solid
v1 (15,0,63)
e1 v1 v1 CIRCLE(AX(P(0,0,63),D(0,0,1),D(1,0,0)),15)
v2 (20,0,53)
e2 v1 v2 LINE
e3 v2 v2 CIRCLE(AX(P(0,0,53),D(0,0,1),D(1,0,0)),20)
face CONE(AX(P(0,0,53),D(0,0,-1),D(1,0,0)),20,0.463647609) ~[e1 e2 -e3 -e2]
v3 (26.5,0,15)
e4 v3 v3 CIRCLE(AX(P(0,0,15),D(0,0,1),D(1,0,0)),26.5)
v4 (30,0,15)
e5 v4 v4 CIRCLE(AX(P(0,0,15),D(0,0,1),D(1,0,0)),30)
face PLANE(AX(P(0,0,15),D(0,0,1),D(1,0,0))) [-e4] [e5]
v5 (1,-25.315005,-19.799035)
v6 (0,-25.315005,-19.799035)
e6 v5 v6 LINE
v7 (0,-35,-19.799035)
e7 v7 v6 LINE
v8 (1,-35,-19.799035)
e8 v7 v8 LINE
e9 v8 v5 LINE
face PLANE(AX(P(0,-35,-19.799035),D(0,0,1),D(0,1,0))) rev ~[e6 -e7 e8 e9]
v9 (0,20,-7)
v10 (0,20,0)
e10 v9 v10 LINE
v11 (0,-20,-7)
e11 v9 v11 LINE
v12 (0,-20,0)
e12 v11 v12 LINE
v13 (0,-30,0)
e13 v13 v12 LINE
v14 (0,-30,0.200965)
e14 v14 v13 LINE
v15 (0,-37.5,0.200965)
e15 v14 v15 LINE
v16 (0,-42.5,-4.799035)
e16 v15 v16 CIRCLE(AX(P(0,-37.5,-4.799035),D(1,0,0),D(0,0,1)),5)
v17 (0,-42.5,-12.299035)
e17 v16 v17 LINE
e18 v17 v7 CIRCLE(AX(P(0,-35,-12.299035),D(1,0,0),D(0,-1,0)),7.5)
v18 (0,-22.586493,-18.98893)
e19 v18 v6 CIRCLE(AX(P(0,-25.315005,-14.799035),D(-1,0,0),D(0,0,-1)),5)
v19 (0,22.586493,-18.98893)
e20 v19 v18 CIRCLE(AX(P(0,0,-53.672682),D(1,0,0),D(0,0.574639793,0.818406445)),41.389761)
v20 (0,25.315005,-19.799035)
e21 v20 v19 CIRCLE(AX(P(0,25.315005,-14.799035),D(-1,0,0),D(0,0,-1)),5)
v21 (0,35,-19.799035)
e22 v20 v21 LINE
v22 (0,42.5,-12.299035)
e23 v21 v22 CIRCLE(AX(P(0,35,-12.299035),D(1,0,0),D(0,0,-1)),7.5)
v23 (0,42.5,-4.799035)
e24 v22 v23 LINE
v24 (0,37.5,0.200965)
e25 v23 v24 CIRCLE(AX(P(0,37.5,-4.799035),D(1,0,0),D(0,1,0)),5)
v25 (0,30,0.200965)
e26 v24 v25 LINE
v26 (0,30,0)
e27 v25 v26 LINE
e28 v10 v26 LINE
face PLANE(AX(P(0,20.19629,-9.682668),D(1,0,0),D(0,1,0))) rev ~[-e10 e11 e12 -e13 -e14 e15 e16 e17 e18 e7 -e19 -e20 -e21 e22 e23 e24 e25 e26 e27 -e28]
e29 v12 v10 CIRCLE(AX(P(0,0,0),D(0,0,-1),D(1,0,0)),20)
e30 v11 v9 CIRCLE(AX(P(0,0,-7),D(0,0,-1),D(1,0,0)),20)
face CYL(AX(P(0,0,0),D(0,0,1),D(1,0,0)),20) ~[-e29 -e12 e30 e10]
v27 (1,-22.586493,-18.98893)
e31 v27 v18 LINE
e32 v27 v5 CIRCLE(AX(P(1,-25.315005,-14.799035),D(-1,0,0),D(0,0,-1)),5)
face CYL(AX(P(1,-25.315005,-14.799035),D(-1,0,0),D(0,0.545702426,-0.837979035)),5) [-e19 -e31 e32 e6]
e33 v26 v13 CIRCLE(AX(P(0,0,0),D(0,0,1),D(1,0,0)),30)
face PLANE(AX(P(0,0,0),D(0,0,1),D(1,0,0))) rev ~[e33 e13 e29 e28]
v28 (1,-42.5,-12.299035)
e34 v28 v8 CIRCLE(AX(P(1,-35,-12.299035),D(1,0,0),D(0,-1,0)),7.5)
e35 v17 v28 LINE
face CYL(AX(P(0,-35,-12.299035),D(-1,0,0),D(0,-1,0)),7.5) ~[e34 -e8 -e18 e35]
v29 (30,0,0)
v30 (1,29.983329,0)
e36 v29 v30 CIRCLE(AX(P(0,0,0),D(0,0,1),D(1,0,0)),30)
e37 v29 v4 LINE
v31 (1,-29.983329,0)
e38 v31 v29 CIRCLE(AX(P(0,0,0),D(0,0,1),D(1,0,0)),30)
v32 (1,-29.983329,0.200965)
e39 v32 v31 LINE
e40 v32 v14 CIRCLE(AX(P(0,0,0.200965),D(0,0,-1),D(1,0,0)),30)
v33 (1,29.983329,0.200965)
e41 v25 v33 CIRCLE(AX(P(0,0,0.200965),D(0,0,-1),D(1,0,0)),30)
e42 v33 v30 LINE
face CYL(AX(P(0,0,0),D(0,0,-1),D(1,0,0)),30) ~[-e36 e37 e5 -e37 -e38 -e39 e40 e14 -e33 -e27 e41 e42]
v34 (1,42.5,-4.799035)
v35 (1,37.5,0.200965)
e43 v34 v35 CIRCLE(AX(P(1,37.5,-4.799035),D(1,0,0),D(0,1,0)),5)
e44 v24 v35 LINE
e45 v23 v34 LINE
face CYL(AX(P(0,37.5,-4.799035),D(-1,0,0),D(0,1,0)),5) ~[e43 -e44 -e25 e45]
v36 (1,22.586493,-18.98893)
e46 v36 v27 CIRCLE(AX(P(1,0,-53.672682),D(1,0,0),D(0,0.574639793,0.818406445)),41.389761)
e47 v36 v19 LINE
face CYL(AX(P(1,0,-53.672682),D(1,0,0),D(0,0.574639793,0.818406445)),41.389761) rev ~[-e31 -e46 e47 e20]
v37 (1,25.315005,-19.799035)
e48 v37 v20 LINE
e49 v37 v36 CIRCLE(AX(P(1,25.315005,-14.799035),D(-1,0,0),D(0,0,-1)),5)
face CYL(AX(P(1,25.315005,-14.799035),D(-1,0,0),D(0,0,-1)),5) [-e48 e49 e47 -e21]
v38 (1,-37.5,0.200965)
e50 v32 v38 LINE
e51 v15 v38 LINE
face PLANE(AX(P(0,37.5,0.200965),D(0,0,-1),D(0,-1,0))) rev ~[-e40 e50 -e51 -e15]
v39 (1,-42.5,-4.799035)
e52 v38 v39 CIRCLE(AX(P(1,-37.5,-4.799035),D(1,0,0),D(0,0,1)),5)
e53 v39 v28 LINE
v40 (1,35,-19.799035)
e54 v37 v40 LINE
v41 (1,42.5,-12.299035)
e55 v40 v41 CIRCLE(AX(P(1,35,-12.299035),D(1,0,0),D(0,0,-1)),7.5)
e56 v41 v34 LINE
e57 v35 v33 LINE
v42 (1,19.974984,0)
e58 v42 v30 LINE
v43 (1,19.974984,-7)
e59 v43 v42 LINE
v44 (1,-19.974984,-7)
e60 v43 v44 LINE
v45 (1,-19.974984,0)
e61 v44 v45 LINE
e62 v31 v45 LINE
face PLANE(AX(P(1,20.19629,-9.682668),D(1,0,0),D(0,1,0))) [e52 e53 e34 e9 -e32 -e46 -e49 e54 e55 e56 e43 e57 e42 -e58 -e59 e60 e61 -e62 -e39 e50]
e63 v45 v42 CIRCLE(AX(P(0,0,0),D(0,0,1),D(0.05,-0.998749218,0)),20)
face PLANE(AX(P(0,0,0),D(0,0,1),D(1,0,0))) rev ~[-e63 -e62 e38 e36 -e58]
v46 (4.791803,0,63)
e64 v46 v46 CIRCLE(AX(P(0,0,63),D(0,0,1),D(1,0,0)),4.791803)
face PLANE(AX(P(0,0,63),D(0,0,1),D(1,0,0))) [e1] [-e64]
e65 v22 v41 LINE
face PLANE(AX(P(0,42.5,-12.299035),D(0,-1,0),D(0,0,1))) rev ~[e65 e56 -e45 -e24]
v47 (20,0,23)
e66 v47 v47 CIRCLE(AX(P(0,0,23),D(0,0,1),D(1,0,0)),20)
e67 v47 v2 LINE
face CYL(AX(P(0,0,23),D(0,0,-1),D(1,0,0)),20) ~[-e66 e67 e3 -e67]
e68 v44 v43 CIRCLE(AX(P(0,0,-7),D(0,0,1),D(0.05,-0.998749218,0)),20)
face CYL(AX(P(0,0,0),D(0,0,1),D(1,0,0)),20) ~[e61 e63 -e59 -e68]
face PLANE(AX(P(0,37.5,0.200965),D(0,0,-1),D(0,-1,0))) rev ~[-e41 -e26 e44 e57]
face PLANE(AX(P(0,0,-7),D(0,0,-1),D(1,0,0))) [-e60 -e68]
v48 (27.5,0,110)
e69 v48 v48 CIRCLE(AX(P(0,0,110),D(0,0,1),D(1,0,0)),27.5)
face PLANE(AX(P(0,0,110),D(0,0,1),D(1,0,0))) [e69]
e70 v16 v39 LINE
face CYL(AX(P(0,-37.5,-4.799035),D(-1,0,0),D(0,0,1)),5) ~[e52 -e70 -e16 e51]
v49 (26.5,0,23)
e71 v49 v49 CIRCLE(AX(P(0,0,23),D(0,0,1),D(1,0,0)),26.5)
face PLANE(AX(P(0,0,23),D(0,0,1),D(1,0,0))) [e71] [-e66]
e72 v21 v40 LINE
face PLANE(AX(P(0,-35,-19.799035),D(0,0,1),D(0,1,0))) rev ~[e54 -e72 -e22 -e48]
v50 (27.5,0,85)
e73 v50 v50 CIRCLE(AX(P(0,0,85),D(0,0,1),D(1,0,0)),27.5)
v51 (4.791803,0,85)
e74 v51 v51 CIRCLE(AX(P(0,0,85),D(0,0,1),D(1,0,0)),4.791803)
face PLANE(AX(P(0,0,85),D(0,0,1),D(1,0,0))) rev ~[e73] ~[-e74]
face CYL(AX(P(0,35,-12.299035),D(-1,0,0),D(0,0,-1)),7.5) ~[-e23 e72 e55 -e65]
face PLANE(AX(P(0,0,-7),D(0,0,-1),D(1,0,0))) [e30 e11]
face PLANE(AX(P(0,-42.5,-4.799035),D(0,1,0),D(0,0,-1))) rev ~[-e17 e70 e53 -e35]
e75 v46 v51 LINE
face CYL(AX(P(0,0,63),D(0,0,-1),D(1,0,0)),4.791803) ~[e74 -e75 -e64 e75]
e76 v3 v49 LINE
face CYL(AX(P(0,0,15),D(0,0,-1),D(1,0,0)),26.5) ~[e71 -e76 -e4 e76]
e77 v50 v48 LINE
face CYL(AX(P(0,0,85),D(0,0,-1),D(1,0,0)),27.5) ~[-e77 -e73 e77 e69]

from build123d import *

# Parameters (mm, degrees)
F0_R      = 30
F1_DEPTH  = 15
F2_R      = 26.5
F3_DEPTH  = 8
F4_R      = 20
F5_DEPTH  = 40
F6_R      = 20
F7_DEPTH  = 7
F9_DEPTH  = 1
F11_DEPTH = 25
F12_R     = 5
F13_SIZE2 = 10
F13_SIZE  = 5
F14_R     = 1
F15_DEPTH = 15
F16_R     = 4.7918026285
F16_R_2   = 1
F17_DEPTH = 22
F18_R     = 27.5
F18_R_2   = 4.7918026285
F19_DEPTH = 25


# Not quite as in the source:
# - a feature names something its author has since deleted; it is built from what else it names


with BuildPart() as f1:
    # F0 (on Top) → F1 (new body)
    with BuildSketch(Plane.XY):
        Circle(F0_R)
    extrude(amount=F1_DEPTH)

    # F2 (on face) → F3 (join)
    with BuildSketch(Plane.XY.offset(15)):
        Circle(F2_R)
    extrude(amount=F3_DEPTH)

    # F4 (on face) → F5 (join)
    with BuildSketch(Plane.XY.offset(23)):
        Circle(F4_R)
    extrude(amount=F5_DEPTH)

    # F6 (on face) → F7 (join)
    with BuildSketch(Plane(origin=(0, 0, 0), x_dir=(1, 0, 0), z_dir=(0, 0, -1))):
        Circle(F6_R)
    extrude(amount=F7_DEPTH)

    # F8 (on Right) → F9 (join)
    with BuildSketch(Plane.YZ):
        with BuildLine():
            Line((37.5, 0.200964841), (0, 0.200964841))
            Line((0, 0.200964841), (0, -19.799035159))
            Line((0, -19.799035159), (35, -19.799035159))
            ThreePointArc((35, -19.799035159), (40.3033008589, -17.6023360179), (42.5, -12.299035159))
            Line((42.5, -12.299035159), (42.5, -4.799035159))
            ThreePointArc((42.5, -4.799035159), (41.0355339059, -1.2635012531), (37.5, 0.200964841))
        make_face()
        with BuildLine():
            Line((0, -19.799035159), (0, 0.200964841))
            Line((0, 0.200964841), (-37.5, 0.200964841))
            ThreePointArc((-37.5, 0.200964841), (-41.0355339059, -1.2635012531), (-42.5, -4.799035159))
            Line((-42.5, -4.799035159), (-42.5, -12.299035159))
            ThreePointArc((-42.5, -12.299035159), (-40.3033008589, -17.6023360179), (-35, -19.799035159))
            Line((-35, -19.799035159), (0, -19.799035159))
        make_face()
    extrude(amount=F9_DEPTH)

    # F10 (on face) → F11 (cut)
    with BuildSketch(Plane.YZ.offset(1)):
        with BuildLine():
            Line((-23.7842038121, -19.799035159), (23.7842038121, -19.799035159))
            ThreePointArc((23.7842038121, -19.799035159), (0, -12.2829212631), (-23.7842038121, -19.799035159))
        make_face()
    extrude(amount=-F11_DEPTH, mode=Mode.SUBTRACT)

    # F12
    f12_edges = [f1.edges().sort_by_distance(p)[0] for p in [
        (0.5, -23.784204, -19.799035),
        (0.5, 23.784204, -19.799035),
    ]]
    fillet(f12_edges, radius=F12_R)

    # F13
    f13_edges = [f1.edges().sort_by_distance(p)[0] for p in [
        (-20, 0, 63),
    ]]
    f13_side = f1.faces().sort_by_distance((0, 0, 63))[0]
    chamfer(f13_edges, length=F13_SIZE, length2=F13_SIZE2, reference=f13_side)

    # F14 (on face) → F15 (join)
    with BuildSketch(Plane.XY.offset(63)):
        Circle(F14_R)
    extrude(amount=F15_DEPTH)

    # F16 (on face) → F17 (join)
    with BuildSketch(Plane.XY.offset(63)):
        Circle(F16_R)
        Circle(F16_R_2, mode=Mode.SUBTRACT)
        Circle(F16_R_2)
    extrude(amount=F17_DEPTH)

    # F18 (on face) → F19 (join)
    with BuildSketch(Plane.XY.offset(85)):
        Circle(F18_R)
        Circle(F18_R_2, mode=Mode.SUBTRACT)
        Circle(F18_R_2)
    extrude(amount=F19_DEPTH)


solid = f1.part
